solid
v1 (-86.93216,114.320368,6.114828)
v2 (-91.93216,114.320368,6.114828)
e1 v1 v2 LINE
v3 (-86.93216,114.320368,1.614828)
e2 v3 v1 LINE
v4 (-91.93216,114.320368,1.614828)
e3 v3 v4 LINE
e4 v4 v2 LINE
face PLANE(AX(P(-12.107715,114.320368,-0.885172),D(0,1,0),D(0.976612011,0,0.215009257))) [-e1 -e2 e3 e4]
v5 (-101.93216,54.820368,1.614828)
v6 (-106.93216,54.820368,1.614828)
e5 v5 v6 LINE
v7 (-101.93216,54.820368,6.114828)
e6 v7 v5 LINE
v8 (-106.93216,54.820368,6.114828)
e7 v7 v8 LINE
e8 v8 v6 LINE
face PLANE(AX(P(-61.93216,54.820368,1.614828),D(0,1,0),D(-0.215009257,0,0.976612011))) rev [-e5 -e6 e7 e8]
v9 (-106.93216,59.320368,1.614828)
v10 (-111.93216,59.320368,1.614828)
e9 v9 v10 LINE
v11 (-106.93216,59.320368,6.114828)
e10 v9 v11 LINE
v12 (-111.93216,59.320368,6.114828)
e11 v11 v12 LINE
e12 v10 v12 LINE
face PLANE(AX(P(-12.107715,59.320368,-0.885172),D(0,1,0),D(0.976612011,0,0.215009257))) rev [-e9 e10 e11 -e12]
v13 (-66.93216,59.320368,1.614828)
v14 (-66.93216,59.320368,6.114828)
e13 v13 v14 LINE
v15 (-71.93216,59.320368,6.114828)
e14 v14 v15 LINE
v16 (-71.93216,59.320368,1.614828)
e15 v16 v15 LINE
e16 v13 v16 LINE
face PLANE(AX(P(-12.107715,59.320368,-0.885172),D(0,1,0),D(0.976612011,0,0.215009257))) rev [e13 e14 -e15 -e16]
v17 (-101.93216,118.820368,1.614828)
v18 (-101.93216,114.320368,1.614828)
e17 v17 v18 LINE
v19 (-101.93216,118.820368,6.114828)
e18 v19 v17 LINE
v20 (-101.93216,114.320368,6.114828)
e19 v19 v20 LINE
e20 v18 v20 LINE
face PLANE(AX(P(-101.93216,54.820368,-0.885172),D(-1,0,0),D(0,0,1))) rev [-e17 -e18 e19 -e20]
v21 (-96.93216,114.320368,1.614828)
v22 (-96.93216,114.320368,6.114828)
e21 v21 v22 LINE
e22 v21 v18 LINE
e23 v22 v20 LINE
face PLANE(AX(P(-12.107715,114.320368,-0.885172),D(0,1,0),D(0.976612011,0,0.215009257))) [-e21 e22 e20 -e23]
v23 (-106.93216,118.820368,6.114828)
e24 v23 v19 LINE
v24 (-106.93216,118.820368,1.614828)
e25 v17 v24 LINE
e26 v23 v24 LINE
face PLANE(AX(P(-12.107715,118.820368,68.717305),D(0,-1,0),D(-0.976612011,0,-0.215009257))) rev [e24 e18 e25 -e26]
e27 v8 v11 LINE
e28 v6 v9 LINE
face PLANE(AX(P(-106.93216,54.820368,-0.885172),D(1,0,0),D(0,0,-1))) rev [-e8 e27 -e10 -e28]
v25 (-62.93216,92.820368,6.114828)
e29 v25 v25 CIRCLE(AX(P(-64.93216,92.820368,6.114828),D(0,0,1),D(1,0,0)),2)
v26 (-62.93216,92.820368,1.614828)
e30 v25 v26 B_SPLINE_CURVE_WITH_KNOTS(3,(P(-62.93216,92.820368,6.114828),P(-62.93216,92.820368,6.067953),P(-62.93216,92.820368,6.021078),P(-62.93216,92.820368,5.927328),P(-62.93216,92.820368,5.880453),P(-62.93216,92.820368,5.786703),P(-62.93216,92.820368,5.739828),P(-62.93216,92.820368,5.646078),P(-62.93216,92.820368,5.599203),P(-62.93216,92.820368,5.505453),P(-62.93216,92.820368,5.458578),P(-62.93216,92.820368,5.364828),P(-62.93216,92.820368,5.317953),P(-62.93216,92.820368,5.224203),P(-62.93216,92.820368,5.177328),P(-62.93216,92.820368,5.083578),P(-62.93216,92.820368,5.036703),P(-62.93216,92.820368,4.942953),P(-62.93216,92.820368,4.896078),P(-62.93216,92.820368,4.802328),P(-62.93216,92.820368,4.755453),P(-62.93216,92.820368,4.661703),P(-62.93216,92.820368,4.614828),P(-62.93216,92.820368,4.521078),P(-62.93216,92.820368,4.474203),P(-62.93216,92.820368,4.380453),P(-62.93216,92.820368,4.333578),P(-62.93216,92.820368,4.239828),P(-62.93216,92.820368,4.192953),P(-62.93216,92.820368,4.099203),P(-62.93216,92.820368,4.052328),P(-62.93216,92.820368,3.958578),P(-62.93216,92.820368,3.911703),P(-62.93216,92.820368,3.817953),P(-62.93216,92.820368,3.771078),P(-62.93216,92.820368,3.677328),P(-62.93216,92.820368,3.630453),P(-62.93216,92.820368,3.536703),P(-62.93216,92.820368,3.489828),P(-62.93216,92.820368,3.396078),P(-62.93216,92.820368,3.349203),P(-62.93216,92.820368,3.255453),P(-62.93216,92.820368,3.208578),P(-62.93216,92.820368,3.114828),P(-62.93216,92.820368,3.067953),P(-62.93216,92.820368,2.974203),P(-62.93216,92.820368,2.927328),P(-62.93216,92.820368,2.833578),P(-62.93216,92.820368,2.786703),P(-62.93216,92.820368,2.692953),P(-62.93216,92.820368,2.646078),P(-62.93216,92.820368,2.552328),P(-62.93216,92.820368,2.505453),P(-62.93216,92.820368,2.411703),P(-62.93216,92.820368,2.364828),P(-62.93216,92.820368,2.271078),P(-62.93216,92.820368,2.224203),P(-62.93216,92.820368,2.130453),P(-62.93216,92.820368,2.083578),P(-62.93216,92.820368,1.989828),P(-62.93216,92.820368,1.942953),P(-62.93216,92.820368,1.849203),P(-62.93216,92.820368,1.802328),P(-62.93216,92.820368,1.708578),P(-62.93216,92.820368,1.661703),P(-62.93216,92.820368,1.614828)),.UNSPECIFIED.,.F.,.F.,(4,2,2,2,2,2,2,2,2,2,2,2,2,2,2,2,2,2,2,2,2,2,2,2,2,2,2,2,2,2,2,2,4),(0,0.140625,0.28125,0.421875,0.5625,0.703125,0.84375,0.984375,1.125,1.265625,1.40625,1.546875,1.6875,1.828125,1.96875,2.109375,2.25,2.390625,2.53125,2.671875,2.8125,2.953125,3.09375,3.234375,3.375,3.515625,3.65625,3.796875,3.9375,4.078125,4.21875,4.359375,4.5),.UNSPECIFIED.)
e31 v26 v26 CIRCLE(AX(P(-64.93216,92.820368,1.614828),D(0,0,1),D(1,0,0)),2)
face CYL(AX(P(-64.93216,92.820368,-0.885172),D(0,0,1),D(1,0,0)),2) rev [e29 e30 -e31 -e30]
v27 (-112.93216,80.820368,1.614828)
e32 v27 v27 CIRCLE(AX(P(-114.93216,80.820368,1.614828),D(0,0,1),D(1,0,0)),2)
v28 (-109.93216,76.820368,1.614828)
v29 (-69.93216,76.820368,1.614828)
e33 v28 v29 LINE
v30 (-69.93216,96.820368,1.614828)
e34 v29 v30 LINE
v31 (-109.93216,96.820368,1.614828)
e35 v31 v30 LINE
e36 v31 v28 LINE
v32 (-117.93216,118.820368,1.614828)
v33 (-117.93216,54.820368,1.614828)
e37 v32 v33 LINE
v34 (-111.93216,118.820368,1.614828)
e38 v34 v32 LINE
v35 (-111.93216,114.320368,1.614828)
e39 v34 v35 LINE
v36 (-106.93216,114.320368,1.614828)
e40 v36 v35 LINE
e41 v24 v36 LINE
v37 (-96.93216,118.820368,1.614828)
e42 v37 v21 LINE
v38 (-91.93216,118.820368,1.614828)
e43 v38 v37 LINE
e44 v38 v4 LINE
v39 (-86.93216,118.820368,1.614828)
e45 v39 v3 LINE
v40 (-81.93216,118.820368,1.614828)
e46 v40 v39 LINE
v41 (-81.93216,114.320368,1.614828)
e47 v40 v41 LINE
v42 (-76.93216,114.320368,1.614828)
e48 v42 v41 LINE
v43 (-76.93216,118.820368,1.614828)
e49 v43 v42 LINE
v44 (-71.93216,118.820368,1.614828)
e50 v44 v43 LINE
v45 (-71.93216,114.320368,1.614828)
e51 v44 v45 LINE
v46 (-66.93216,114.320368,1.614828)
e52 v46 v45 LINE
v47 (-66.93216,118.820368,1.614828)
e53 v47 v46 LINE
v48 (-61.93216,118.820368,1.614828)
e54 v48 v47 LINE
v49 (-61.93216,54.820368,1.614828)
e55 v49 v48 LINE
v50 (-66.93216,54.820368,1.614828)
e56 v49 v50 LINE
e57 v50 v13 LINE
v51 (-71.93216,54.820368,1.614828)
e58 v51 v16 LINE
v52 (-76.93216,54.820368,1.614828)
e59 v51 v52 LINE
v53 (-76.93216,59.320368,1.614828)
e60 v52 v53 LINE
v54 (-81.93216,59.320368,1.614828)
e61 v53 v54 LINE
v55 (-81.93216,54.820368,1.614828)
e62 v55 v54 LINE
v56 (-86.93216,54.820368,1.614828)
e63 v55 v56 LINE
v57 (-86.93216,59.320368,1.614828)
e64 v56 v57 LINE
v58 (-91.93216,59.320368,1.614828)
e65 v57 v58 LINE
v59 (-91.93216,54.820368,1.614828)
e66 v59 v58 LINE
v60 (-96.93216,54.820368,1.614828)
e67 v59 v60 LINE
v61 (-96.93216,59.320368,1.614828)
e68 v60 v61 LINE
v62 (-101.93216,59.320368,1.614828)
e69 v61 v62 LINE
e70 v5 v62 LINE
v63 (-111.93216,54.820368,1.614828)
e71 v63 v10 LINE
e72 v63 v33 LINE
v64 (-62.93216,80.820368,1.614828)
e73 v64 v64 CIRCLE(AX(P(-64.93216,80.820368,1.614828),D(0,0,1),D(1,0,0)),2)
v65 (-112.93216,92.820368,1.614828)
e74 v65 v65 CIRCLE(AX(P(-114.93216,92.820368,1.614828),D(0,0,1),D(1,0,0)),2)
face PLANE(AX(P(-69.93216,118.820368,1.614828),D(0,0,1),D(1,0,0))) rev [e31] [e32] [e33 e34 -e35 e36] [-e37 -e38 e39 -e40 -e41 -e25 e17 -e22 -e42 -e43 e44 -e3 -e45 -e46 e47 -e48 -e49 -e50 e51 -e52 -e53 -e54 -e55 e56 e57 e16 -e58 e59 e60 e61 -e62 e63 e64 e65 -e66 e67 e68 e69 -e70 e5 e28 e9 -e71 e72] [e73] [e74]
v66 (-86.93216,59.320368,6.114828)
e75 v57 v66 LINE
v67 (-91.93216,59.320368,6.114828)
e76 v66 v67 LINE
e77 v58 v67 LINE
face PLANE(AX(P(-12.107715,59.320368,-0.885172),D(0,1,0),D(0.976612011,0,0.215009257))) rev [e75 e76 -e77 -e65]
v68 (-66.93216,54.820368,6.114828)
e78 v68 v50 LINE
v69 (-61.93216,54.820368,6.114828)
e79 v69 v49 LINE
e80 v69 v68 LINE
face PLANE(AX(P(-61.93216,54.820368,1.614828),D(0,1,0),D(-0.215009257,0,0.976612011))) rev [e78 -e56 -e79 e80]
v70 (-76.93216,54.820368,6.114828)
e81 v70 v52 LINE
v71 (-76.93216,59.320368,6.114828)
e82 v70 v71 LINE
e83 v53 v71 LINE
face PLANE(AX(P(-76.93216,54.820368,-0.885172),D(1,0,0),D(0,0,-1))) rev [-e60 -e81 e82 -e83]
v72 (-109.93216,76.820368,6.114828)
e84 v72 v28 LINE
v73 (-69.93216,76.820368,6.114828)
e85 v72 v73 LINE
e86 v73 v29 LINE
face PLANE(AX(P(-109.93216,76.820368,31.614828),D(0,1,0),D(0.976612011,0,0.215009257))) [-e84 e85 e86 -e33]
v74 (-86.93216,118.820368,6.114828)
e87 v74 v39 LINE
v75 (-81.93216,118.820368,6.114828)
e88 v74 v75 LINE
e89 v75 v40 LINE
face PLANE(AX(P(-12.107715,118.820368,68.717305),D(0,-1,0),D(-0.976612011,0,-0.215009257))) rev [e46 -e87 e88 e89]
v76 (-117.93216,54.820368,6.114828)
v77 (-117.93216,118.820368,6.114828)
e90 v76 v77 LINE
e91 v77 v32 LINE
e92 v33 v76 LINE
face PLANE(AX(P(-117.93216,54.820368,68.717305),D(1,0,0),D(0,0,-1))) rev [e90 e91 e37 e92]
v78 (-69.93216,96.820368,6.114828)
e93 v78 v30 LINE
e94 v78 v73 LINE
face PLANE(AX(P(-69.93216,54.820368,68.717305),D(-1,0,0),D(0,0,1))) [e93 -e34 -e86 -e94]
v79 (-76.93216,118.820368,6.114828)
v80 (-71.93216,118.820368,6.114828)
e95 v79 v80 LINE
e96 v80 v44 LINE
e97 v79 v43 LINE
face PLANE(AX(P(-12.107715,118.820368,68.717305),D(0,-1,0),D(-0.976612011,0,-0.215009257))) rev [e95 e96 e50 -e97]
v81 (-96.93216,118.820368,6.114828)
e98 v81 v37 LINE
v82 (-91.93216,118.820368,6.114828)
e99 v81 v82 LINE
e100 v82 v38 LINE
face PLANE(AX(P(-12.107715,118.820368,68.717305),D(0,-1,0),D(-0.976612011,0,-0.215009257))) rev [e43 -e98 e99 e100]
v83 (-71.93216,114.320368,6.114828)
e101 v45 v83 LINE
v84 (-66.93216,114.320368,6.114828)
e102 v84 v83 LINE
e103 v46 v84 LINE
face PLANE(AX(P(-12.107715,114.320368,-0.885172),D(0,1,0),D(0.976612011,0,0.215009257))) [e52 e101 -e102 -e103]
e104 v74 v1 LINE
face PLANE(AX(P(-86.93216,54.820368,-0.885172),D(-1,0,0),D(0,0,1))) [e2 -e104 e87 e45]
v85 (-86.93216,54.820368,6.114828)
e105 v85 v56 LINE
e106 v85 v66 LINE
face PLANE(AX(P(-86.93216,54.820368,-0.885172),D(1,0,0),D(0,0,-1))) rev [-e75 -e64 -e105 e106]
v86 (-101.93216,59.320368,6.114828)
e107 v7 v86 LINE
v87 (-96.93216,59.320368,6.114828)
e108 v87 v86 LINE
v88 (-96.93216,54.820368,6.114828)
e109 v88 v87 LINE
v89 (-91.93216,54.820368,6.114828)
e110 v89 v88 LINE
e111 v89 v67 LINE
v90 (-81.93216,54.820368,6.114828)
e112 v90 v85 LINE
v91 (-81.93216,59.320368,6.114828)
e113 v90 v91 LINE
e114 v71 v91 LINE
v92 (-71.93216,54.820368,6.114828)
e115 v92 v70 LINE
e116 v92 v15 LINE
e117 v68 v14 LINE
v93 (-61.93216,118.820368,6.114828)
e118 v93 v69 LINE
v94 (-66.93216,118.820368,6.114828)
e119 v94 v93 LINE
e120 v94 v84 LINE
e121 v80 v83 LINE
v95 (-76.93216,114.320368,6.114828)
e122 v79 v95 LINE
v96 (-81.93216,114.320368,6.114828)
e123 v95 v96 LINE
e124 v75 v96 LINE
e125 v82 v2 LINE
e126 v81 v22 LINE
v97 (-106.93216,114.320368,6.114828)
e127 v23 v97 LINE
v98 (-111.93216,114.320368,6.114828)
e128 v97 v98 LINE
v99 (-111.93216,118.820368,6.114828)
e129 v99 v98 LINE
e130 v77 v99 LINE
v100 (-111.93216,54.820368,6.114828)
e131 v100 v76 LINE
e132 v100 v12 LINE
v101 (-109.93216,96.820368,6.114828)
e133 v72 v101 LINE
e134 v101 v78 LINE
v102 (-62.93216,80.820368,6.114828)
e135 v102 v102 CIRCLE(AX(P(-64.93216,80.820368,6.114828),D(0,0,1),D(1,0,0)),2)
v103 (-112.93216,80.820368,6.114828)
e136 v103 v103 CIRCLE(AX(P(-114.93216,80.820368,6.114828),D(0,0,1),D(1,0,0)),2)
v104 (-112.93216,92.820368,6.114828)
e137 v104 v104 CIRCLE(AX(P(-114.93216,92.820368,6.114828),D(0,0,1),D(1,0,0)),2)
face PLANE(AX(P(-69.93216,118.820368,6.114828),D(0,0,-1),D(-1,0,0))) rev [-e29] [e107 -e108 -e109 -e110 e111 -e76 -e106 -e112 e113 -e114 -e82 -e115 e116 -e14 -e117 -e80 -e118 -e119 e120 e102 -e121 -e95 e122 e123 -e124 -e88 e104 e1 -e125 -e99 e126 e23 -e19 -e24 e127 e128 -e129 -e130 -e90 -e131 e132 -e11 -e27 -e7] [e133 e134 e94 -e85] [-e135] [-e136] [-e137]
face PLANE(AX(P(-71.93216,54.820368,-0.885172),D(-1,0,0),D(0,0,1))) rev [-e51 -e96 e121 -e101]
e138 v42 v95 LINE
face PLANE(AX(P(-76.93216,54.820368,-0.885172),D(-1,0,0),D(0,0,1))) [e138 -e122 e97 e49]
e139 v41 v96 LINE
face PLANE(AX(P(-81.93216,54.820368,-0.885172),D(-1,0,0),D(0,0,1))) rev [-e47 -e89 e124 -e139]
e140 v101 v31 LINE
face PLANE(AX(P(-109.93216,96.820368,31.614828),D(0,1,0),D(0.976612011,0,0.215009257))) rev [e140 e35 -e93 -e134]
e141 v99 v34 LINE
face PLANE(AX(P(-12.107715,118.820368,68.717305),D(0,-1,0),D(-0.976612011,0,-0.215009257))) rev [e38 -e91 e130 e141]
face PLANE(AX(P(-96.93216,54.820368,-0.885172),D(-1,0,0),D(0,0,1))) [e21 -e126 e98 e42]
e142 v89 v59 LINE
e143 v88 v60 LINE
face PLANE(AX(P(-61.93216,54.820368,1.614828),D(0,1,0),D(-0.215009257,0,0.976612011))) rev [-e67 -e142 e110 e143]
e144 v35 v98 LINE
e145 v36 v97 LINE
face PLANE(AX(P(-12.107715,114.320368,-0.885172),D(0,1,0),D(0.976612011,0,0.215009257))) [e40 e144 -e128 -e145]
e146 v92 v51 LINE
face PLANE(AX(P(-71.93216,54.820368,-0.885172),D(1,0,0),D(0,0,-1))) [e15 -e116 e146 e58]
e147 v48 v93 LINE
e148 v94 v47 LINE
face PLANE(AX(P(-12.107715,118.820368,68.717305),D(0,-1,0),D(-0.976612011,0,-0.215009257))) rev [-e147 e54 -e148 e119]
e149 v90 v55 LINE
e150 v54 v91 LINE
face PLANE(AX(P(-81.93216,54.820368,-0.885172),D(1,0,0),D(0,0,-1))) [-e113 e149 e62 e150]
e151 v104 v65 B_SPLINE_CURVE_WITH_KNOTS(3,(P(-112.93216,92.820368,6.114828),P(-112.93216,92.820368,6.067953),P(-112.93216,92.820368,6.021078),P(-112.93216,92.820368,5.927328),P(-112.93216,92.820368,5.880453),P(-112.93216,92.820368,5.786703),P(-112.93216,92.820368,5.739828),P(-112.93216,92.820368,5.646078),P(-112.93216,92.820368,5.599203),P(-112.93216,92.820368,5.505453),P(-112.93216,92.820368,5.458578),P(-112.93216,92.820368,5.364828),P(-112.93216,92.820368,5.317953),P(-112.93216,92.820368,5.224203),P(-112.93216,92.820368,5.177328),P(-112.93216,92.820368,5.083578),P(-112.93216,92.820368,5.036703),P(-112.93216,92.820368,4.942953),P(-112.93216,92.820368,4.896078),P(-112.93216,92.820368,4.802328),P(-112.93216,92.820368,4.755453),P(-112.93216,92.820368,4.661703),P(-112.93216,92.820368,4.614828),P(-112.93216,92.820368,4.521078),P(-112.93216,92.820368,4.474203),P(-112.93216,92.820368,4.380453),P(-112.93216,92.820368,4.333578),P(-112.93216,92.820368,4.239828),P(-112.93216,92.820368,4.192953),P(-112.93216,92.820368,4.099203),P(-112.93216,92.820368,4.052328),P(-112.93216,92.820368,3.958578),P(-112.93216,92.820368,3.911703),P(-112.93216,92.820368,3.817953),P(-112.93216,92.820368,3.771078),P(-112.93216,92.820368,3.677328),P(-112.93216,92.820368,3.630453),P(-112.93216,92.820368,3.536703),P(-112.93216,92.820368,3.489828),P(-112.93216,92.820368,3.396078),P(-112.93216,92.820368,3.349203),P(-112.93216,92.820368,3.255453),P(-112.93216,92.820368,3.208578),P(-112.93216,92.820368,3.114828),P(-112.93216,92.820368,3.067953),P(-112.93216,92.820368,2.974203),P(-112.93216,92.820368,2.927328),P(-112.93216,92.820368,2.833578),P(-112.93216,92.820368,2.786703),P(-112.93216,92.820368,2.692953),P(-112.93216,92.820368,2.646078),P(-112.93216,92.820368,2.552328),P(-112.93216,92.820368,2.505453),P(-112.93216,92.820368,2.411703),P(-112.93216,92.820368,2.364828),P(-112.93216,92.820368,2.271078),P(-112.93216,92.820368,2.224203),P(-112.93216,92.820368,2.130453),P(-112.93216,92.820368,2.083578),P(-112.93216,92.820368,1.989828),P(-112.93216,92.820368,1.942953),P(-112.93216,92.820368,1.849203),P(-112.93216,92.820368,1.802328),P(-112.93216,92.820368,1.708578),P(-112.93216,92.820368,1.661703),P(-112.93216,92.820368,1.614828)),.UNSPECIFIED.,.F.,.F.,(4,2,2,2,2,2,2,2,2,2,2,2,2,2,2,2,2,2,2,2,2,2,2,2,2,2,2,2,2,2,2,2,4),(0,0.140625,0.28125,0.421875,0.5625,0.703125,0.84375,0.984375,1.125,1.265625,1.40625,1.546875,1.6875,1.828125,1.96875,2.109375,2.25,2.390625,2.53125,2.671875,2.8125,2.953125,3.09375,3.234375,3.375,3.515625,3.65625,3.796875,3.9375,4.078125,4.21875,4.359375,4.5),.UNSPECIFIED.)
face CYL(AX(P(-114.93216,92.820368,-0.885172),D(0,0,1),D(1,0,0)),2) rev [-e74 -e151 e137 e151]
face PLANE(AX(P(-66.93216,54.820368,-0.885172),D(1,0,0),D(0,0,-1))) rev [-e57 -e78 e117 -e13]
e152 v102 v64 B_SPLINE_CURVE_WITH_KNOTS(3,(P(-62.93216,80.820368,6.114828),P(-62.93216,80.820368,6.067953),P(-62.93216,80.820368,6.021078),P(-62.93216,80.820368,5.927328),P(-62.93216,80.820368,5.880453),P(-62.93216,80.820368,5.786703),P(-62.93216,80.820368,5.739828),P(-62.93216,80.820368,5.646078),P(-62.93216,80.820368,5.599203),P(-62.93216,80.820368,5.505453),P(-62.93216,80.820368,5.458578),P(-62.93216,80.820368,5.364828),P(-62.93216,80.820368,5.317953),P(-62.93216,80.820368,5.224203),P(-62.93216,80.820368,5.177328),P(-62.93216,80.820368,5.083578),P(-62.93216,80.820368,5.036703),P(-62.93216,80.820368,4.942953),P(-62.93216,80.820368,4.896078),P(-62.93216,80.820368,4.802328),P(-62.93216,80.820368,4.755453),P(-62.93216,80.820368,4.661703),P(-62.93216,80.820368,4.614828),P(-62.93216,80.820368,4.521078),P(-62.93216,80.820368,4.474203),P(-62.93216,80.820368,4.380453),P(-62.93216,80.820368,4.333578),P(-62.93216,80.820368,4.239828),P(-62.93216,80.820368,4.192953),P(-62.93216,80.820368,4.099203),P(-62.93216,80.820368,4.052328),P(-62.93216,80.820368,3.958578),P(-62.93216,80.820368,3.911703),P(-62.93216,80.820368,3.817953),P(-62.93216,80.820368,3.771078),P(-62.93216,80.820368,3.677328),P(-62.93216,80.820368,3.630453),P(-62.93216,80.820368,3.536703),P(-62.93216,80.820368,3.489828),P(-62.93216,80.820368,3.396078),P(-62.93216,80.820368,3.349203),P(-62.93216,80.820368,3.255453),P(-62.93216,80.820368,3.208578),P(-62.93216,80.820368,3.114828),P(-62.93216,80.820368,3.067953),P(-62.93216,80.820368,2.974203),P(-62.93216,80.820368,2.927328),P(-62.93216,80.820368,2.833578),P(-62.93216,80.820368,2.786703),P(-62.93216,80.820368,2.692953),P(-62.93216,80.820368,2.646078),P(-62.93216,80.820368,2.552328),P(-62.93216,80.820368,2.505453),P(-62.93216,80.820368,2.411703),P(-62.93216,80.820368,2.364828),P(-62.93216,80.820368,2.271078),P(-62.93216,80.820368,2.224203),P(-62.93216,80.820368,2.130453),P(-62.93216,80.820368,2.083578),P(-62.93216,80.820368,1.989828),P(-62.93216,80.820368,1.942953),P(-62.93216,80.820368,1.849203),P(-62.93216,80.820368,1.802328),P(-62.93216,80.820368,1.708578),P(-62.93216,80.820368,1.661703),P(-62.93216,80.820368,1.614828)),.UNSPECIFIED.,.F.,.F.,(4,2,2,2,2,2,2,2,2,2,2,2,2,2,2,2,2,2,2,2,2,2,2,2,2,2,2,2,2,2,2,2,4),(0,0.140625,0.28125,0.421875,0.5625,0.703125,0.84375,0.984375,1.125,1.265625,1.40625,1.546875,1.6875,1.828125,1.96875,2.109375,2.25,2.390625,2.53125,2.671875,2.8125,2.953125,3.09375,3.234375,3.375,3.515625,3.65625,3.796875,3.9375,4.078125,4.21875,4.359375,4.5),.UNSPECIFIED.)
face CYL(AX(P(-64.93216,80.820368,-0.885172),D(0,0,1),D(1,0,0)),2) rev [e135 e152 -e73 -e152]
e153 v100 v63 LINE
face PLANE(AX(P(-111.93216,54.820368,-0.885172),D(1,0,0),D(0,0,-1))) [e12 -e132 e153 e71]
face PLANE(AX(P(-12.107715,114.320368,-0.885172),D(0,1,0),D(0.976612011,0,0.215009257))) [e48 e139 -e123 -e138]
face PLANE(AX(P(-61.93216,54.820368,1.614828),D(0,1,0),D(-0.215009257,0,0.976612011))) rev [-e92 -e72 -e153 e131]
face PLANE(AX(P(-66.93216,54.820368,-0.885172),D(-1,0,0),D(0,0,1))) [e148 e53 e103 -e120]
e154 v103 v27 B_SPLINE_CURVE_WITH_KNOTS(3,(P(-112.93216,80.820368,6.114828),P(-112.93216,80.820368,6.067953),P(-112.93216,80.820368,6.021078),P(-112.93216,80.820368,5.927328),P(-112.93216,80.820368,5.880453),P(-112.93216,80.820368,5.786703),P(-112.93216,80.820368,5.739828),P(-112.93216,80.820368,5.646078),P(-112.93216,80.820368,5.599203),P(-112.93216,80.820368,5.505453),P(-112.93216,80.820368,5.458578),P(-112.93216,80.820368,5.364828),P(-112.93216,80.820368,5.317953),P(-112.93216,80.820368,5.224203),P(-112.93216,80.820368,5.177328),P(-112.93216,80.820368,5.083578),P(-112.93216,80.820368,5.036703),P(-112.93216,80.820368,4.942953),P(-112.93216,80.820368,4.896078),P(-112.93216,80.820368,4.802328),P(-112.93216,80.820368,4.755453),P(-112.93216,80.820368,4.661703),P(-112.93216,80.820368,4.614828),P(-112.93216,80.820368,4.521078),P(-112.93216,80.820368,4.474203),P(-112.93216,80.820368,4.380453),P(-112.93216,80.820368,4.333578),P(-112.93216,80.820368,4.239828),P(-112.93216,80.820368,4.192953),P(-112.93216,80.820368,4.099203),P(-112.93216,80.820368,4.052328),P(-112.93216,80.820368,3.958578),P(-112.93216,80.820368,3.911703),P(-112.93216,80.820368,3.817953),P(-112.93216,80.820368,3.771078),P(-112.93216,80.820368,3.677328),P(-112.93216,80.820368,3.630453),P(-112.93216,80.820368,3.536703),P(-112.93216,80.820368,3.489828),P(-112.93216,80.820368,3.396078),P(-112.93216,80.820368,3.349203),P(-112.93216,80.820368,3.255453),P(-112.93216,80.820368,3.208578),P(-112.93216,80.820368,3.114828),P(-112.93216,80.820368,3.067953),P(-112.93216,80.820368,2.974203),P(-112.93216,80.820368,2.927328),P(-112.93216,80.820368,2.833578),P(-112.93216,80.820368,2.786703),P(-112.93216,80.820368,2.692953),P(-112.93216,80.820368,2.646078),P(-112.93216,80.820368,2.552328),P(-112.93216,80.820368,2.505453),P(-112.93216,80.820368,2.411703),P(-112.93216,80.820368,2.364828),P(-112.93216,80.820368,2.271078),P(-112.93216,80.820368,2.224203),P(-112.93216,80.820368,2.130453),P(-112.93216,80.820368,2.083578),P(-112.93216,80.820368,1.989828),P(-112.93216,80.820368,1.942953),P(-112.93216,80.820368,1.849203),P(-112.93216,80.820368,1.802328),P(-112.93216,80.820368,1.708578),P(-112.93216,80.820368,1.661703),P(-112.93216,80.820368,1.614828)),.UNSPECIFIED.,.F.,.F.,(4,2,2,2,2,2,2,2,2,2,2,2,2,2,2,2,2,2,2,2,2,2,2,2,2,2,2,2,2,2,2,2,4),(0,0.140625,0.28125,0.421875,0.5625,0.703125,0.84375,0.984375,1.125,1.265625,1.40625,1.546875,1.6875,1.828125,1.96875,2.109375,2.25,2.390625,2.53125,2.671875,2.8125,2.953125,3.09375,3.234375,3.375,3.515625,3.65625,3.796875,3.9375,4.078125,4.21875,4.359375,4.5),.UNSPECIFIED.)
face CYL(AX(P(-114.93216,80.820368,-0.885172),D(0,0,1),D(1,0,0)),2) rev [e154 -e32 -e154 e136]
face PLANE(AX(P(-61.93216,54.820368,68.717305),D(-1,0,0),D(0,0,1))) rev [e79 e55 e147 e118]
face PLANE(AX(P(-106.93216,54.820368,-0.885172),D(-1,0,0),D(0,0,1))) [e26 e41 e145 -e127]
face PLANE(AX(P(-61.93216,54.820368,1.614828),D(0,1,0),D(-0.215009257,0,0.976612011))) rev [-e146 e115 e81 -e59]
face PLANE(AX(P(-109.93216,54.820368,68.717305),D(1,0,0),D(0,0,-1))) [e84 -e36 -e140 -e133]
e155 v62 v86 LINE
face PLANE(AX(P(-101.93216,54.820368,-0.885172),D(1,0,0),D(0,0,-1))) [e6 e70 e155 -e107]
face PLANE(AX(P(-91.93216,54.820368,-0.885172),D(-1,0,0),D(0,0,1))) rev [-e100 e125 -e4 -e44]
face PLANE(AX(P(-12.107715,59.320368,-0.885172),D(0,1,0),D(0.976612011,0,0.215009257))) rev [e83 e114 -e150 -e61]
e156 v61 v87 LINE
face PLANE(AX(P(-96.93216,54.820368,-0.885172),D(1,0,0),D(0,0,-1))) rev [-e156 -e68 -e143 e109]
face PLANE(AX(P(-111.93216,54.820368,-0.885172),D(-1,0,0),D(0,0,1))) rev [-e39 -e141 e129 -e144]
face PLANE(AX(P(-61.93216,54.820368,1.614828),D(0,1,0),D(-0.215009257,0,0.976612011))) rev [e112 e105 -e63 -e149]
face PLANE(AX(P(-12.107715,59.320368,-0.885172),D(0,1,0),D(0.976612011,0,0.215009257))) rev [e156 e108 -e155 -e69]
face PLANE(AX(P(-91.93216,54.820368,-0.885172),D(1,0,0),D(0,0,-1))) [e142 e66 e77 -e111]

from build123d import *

# Parameters (mm, degrees)
BOSS_EXTRUDE1_DEPTH   = 64
SKETCH2_W             = 40
SKETCH2_H             = 20
CUT_EXTRUDE1_DEPTH    = 30
SKETCH3_W             = 64
SKETCH3_H             = 4.5
BOSS_EXTRUDE2_DEPTH   = 8
SKETCH4_W             = 64
SKETCH4_H             = 4.5
BOSS_EXTRUDE3_DEPTH   = 8
SKETCH5_R             = 2
CUT_EXTRUDE6_DEPTH    = 7
SKETCH6_W             = 5
SKETCH6_H             = 4.5
CUT_EXTRUDE7_DEPTH    = 7
BODY_MOVE_COPY1_ANGLE = 90
BODY_MOVE_COPY2_ANGLE = 12.4160704


with BuildPart() as part:
    # Sketch1 → Boss-Extrude1 (new body)
    with BuildSketch(Plane.XY):
        Polygon((-70.899702081, 53.100294195), (-109.964182504, 44.499923896), (-108.996640846, 40.105169848), (-69.932160423, 48.705540147), align=None)
    extrude(amount=BOSS_EXTRUDE1_DEPTH)

    # Sketch2 → Cut-Extrude1 (cut)
    with BuildSketch(Plane(origin=(-14.427653835, 65.533085344, 0), x_dir=(0.9766120105757768, 0.21500925747311134, 0), z_dir=(-0.21500925747311134, 0.9766120105757768, 0))):
        with Locations((-77.824445772, -32)):
            Rectangle(SKETCH2_W, SKETCH2_H)
    extrude(amount=-CUT_EXTRUDE1_DEPTH, mode=Mode.SUBTRACT)


with BuildPart() as cut_extrude1_piece_1:
    # of the separate pieces the step leaves, piece 1, a body of its own (cut_extrude1_pieces)
    add(part.part.solids().sort_by_distance((-70.899702081, 53.100294195, 0))[0])



with BuildPart() as cut_extrude1_piece_2:
    # of the separate pieces the step leaves, piece 2, a body of its own (cut_extrude1_pieces)
    add(part.part.solids().sort_by_distance((-70.899702081, 53.100294195, 42))[0])


with BuildPart() as cut_extrude1_piece_1_1:
    add(cut_extrude1_piece_1.part)

    add(cut_extrude1_piece_2.part)  # Boss-Extrude2 merges Cut-Extrude1 piece 2
    # Sketch3 → Boss-Extrude2 (add)
    with BuildSketch(Plane(origin=(-56.472048246, -12.432791149, 0), x_dir=(0, 0, -1), z_dir=(0.976612010575777, 0.2150092574731111, 0))):
        with Locations((-32, 64.852477375)):
            Rectangle(SKETCH3_W, SKETCH3_H)
    extrude(amount=BOSS_EXTRUDE2_DEPTH)

    # Sketch4 → Boss-Extrude3 (add)
    with BuildSketch(Plane(origin=(-95.536528669, -21.033161448, 0), x_dir=(0, 0, 1), z_dir=(-0.9766120105757774, -0.21500925747310878, 0))):
        with Locations((32, 64.852477375)):
            Rectangle(SKETCH4_W, SKETCH4_H)
    extrude(amount=BOSS_EXTRUDE3_DEPTH)

    # Sketch5 → Cut-Extrude6 (cut)
    with BuildSketch(Plane(origin=(-13.460112176, 61.138331296, 0), x_dir=(0.976612010575777, 0.21500925747311095, 0), z_dir=(0.21500925747311095, -0.976612010575777, 0))):
        with Locations((-52.824445772, 26)):
            Circle(SKETCH5_R)
        with Locations((-52.824445772, 38)):
            Circle(SKETCH5_R)
        with Locations((-102.824445772, 26)):
            Circle(SKETCH5_R)
        with Locations((-102.824445772, 38)):
            Circle(SKETCH5_R)
    extrude(amount=-CUT_EXTRUDE6_DEPTH, mode=Mode.SUBTRACT)

    # Sketch6 → Cut-Extrude7 (cut)
    with BuildSketch(Plane(origin=(-13.460112176, 61.138331296, 0), x_dir=(0.976612010575777, 0.21500925747311095, 0), z_dir=(0.21500925747311095, -0.976612010575777, 0))):
        with Locations((-57.324445772, 2.25)):
            Rectangle(SKETCH6_W, SKETCH6_H)
        with Locations((-67.324445772, 2.25)):
            Rectangle(SKETCH6_W, SKETCH6_H)
        with Locations((-77.324445772, 2.25)):
            Rectangle(SKETCH6_W, SKETCH6_H)
        with Locations((-87.324445772, 2.25)):
            Rectangle(SKETCH6_W, SKETCH6_H)
        with Locations((-97.324445772, 2.25)):
            Rectangle(SKETCH6_W, SKETCH6_H)
        with Locations((-97.324445772, 61.75)):
            Rectangle(SKETCH6_W, SKETCH6_H)
        with Locations((-87.324445772, 61.75)):
            Rectangle(SKETCH6_W, SKETCH6_H)
        with Locations((-77.324445772, 61.75)):
            Rectangle(SKETCH6_W, SKETCH6_H)
        with Locations((-67.324445772, 61.75)):
            Rectangle(SKETCH6_W, SKETCH6_H)
        with Locations((-57.324445772, 61.75)):
            Rectangle(SKETCH6_W, SKETCH6_H)
    extrude(amount=-CUT_EXTRUDE7_DEPTH, mode=Mode.SUBTRACT)


with BuildPart() as cut_extrude1_piece_1_2:
    # Body-Move/Copy1: read off the stored shape, not the designer's step
    # Body-Move/Copy1: moved
    add(cut_extrude1_piece_1_1.part.moved(Location((0, -54.8203683, 54.8203683))).rotate(Axis((0, 0, 0), (-1, 0, 0)), BODY_MOVE_COPY1_ANGLE))


with BuildPart() as cut_extrude1_piece_1_3:
    # Body-Move/Copy2: read off the stored shape, not the designer's step
    # Body-Move/Copy2: moved
    add(cut_extrude1_piece_1_2.part.moved(Location((2.9503173, 0, 14.8930484))).rotate(Axis((0, 0, 0), (0, -1, 0)), BODY_MOVE_COPY2_ANGLE))


solid = cut_extrude1_piece_1_3.part
